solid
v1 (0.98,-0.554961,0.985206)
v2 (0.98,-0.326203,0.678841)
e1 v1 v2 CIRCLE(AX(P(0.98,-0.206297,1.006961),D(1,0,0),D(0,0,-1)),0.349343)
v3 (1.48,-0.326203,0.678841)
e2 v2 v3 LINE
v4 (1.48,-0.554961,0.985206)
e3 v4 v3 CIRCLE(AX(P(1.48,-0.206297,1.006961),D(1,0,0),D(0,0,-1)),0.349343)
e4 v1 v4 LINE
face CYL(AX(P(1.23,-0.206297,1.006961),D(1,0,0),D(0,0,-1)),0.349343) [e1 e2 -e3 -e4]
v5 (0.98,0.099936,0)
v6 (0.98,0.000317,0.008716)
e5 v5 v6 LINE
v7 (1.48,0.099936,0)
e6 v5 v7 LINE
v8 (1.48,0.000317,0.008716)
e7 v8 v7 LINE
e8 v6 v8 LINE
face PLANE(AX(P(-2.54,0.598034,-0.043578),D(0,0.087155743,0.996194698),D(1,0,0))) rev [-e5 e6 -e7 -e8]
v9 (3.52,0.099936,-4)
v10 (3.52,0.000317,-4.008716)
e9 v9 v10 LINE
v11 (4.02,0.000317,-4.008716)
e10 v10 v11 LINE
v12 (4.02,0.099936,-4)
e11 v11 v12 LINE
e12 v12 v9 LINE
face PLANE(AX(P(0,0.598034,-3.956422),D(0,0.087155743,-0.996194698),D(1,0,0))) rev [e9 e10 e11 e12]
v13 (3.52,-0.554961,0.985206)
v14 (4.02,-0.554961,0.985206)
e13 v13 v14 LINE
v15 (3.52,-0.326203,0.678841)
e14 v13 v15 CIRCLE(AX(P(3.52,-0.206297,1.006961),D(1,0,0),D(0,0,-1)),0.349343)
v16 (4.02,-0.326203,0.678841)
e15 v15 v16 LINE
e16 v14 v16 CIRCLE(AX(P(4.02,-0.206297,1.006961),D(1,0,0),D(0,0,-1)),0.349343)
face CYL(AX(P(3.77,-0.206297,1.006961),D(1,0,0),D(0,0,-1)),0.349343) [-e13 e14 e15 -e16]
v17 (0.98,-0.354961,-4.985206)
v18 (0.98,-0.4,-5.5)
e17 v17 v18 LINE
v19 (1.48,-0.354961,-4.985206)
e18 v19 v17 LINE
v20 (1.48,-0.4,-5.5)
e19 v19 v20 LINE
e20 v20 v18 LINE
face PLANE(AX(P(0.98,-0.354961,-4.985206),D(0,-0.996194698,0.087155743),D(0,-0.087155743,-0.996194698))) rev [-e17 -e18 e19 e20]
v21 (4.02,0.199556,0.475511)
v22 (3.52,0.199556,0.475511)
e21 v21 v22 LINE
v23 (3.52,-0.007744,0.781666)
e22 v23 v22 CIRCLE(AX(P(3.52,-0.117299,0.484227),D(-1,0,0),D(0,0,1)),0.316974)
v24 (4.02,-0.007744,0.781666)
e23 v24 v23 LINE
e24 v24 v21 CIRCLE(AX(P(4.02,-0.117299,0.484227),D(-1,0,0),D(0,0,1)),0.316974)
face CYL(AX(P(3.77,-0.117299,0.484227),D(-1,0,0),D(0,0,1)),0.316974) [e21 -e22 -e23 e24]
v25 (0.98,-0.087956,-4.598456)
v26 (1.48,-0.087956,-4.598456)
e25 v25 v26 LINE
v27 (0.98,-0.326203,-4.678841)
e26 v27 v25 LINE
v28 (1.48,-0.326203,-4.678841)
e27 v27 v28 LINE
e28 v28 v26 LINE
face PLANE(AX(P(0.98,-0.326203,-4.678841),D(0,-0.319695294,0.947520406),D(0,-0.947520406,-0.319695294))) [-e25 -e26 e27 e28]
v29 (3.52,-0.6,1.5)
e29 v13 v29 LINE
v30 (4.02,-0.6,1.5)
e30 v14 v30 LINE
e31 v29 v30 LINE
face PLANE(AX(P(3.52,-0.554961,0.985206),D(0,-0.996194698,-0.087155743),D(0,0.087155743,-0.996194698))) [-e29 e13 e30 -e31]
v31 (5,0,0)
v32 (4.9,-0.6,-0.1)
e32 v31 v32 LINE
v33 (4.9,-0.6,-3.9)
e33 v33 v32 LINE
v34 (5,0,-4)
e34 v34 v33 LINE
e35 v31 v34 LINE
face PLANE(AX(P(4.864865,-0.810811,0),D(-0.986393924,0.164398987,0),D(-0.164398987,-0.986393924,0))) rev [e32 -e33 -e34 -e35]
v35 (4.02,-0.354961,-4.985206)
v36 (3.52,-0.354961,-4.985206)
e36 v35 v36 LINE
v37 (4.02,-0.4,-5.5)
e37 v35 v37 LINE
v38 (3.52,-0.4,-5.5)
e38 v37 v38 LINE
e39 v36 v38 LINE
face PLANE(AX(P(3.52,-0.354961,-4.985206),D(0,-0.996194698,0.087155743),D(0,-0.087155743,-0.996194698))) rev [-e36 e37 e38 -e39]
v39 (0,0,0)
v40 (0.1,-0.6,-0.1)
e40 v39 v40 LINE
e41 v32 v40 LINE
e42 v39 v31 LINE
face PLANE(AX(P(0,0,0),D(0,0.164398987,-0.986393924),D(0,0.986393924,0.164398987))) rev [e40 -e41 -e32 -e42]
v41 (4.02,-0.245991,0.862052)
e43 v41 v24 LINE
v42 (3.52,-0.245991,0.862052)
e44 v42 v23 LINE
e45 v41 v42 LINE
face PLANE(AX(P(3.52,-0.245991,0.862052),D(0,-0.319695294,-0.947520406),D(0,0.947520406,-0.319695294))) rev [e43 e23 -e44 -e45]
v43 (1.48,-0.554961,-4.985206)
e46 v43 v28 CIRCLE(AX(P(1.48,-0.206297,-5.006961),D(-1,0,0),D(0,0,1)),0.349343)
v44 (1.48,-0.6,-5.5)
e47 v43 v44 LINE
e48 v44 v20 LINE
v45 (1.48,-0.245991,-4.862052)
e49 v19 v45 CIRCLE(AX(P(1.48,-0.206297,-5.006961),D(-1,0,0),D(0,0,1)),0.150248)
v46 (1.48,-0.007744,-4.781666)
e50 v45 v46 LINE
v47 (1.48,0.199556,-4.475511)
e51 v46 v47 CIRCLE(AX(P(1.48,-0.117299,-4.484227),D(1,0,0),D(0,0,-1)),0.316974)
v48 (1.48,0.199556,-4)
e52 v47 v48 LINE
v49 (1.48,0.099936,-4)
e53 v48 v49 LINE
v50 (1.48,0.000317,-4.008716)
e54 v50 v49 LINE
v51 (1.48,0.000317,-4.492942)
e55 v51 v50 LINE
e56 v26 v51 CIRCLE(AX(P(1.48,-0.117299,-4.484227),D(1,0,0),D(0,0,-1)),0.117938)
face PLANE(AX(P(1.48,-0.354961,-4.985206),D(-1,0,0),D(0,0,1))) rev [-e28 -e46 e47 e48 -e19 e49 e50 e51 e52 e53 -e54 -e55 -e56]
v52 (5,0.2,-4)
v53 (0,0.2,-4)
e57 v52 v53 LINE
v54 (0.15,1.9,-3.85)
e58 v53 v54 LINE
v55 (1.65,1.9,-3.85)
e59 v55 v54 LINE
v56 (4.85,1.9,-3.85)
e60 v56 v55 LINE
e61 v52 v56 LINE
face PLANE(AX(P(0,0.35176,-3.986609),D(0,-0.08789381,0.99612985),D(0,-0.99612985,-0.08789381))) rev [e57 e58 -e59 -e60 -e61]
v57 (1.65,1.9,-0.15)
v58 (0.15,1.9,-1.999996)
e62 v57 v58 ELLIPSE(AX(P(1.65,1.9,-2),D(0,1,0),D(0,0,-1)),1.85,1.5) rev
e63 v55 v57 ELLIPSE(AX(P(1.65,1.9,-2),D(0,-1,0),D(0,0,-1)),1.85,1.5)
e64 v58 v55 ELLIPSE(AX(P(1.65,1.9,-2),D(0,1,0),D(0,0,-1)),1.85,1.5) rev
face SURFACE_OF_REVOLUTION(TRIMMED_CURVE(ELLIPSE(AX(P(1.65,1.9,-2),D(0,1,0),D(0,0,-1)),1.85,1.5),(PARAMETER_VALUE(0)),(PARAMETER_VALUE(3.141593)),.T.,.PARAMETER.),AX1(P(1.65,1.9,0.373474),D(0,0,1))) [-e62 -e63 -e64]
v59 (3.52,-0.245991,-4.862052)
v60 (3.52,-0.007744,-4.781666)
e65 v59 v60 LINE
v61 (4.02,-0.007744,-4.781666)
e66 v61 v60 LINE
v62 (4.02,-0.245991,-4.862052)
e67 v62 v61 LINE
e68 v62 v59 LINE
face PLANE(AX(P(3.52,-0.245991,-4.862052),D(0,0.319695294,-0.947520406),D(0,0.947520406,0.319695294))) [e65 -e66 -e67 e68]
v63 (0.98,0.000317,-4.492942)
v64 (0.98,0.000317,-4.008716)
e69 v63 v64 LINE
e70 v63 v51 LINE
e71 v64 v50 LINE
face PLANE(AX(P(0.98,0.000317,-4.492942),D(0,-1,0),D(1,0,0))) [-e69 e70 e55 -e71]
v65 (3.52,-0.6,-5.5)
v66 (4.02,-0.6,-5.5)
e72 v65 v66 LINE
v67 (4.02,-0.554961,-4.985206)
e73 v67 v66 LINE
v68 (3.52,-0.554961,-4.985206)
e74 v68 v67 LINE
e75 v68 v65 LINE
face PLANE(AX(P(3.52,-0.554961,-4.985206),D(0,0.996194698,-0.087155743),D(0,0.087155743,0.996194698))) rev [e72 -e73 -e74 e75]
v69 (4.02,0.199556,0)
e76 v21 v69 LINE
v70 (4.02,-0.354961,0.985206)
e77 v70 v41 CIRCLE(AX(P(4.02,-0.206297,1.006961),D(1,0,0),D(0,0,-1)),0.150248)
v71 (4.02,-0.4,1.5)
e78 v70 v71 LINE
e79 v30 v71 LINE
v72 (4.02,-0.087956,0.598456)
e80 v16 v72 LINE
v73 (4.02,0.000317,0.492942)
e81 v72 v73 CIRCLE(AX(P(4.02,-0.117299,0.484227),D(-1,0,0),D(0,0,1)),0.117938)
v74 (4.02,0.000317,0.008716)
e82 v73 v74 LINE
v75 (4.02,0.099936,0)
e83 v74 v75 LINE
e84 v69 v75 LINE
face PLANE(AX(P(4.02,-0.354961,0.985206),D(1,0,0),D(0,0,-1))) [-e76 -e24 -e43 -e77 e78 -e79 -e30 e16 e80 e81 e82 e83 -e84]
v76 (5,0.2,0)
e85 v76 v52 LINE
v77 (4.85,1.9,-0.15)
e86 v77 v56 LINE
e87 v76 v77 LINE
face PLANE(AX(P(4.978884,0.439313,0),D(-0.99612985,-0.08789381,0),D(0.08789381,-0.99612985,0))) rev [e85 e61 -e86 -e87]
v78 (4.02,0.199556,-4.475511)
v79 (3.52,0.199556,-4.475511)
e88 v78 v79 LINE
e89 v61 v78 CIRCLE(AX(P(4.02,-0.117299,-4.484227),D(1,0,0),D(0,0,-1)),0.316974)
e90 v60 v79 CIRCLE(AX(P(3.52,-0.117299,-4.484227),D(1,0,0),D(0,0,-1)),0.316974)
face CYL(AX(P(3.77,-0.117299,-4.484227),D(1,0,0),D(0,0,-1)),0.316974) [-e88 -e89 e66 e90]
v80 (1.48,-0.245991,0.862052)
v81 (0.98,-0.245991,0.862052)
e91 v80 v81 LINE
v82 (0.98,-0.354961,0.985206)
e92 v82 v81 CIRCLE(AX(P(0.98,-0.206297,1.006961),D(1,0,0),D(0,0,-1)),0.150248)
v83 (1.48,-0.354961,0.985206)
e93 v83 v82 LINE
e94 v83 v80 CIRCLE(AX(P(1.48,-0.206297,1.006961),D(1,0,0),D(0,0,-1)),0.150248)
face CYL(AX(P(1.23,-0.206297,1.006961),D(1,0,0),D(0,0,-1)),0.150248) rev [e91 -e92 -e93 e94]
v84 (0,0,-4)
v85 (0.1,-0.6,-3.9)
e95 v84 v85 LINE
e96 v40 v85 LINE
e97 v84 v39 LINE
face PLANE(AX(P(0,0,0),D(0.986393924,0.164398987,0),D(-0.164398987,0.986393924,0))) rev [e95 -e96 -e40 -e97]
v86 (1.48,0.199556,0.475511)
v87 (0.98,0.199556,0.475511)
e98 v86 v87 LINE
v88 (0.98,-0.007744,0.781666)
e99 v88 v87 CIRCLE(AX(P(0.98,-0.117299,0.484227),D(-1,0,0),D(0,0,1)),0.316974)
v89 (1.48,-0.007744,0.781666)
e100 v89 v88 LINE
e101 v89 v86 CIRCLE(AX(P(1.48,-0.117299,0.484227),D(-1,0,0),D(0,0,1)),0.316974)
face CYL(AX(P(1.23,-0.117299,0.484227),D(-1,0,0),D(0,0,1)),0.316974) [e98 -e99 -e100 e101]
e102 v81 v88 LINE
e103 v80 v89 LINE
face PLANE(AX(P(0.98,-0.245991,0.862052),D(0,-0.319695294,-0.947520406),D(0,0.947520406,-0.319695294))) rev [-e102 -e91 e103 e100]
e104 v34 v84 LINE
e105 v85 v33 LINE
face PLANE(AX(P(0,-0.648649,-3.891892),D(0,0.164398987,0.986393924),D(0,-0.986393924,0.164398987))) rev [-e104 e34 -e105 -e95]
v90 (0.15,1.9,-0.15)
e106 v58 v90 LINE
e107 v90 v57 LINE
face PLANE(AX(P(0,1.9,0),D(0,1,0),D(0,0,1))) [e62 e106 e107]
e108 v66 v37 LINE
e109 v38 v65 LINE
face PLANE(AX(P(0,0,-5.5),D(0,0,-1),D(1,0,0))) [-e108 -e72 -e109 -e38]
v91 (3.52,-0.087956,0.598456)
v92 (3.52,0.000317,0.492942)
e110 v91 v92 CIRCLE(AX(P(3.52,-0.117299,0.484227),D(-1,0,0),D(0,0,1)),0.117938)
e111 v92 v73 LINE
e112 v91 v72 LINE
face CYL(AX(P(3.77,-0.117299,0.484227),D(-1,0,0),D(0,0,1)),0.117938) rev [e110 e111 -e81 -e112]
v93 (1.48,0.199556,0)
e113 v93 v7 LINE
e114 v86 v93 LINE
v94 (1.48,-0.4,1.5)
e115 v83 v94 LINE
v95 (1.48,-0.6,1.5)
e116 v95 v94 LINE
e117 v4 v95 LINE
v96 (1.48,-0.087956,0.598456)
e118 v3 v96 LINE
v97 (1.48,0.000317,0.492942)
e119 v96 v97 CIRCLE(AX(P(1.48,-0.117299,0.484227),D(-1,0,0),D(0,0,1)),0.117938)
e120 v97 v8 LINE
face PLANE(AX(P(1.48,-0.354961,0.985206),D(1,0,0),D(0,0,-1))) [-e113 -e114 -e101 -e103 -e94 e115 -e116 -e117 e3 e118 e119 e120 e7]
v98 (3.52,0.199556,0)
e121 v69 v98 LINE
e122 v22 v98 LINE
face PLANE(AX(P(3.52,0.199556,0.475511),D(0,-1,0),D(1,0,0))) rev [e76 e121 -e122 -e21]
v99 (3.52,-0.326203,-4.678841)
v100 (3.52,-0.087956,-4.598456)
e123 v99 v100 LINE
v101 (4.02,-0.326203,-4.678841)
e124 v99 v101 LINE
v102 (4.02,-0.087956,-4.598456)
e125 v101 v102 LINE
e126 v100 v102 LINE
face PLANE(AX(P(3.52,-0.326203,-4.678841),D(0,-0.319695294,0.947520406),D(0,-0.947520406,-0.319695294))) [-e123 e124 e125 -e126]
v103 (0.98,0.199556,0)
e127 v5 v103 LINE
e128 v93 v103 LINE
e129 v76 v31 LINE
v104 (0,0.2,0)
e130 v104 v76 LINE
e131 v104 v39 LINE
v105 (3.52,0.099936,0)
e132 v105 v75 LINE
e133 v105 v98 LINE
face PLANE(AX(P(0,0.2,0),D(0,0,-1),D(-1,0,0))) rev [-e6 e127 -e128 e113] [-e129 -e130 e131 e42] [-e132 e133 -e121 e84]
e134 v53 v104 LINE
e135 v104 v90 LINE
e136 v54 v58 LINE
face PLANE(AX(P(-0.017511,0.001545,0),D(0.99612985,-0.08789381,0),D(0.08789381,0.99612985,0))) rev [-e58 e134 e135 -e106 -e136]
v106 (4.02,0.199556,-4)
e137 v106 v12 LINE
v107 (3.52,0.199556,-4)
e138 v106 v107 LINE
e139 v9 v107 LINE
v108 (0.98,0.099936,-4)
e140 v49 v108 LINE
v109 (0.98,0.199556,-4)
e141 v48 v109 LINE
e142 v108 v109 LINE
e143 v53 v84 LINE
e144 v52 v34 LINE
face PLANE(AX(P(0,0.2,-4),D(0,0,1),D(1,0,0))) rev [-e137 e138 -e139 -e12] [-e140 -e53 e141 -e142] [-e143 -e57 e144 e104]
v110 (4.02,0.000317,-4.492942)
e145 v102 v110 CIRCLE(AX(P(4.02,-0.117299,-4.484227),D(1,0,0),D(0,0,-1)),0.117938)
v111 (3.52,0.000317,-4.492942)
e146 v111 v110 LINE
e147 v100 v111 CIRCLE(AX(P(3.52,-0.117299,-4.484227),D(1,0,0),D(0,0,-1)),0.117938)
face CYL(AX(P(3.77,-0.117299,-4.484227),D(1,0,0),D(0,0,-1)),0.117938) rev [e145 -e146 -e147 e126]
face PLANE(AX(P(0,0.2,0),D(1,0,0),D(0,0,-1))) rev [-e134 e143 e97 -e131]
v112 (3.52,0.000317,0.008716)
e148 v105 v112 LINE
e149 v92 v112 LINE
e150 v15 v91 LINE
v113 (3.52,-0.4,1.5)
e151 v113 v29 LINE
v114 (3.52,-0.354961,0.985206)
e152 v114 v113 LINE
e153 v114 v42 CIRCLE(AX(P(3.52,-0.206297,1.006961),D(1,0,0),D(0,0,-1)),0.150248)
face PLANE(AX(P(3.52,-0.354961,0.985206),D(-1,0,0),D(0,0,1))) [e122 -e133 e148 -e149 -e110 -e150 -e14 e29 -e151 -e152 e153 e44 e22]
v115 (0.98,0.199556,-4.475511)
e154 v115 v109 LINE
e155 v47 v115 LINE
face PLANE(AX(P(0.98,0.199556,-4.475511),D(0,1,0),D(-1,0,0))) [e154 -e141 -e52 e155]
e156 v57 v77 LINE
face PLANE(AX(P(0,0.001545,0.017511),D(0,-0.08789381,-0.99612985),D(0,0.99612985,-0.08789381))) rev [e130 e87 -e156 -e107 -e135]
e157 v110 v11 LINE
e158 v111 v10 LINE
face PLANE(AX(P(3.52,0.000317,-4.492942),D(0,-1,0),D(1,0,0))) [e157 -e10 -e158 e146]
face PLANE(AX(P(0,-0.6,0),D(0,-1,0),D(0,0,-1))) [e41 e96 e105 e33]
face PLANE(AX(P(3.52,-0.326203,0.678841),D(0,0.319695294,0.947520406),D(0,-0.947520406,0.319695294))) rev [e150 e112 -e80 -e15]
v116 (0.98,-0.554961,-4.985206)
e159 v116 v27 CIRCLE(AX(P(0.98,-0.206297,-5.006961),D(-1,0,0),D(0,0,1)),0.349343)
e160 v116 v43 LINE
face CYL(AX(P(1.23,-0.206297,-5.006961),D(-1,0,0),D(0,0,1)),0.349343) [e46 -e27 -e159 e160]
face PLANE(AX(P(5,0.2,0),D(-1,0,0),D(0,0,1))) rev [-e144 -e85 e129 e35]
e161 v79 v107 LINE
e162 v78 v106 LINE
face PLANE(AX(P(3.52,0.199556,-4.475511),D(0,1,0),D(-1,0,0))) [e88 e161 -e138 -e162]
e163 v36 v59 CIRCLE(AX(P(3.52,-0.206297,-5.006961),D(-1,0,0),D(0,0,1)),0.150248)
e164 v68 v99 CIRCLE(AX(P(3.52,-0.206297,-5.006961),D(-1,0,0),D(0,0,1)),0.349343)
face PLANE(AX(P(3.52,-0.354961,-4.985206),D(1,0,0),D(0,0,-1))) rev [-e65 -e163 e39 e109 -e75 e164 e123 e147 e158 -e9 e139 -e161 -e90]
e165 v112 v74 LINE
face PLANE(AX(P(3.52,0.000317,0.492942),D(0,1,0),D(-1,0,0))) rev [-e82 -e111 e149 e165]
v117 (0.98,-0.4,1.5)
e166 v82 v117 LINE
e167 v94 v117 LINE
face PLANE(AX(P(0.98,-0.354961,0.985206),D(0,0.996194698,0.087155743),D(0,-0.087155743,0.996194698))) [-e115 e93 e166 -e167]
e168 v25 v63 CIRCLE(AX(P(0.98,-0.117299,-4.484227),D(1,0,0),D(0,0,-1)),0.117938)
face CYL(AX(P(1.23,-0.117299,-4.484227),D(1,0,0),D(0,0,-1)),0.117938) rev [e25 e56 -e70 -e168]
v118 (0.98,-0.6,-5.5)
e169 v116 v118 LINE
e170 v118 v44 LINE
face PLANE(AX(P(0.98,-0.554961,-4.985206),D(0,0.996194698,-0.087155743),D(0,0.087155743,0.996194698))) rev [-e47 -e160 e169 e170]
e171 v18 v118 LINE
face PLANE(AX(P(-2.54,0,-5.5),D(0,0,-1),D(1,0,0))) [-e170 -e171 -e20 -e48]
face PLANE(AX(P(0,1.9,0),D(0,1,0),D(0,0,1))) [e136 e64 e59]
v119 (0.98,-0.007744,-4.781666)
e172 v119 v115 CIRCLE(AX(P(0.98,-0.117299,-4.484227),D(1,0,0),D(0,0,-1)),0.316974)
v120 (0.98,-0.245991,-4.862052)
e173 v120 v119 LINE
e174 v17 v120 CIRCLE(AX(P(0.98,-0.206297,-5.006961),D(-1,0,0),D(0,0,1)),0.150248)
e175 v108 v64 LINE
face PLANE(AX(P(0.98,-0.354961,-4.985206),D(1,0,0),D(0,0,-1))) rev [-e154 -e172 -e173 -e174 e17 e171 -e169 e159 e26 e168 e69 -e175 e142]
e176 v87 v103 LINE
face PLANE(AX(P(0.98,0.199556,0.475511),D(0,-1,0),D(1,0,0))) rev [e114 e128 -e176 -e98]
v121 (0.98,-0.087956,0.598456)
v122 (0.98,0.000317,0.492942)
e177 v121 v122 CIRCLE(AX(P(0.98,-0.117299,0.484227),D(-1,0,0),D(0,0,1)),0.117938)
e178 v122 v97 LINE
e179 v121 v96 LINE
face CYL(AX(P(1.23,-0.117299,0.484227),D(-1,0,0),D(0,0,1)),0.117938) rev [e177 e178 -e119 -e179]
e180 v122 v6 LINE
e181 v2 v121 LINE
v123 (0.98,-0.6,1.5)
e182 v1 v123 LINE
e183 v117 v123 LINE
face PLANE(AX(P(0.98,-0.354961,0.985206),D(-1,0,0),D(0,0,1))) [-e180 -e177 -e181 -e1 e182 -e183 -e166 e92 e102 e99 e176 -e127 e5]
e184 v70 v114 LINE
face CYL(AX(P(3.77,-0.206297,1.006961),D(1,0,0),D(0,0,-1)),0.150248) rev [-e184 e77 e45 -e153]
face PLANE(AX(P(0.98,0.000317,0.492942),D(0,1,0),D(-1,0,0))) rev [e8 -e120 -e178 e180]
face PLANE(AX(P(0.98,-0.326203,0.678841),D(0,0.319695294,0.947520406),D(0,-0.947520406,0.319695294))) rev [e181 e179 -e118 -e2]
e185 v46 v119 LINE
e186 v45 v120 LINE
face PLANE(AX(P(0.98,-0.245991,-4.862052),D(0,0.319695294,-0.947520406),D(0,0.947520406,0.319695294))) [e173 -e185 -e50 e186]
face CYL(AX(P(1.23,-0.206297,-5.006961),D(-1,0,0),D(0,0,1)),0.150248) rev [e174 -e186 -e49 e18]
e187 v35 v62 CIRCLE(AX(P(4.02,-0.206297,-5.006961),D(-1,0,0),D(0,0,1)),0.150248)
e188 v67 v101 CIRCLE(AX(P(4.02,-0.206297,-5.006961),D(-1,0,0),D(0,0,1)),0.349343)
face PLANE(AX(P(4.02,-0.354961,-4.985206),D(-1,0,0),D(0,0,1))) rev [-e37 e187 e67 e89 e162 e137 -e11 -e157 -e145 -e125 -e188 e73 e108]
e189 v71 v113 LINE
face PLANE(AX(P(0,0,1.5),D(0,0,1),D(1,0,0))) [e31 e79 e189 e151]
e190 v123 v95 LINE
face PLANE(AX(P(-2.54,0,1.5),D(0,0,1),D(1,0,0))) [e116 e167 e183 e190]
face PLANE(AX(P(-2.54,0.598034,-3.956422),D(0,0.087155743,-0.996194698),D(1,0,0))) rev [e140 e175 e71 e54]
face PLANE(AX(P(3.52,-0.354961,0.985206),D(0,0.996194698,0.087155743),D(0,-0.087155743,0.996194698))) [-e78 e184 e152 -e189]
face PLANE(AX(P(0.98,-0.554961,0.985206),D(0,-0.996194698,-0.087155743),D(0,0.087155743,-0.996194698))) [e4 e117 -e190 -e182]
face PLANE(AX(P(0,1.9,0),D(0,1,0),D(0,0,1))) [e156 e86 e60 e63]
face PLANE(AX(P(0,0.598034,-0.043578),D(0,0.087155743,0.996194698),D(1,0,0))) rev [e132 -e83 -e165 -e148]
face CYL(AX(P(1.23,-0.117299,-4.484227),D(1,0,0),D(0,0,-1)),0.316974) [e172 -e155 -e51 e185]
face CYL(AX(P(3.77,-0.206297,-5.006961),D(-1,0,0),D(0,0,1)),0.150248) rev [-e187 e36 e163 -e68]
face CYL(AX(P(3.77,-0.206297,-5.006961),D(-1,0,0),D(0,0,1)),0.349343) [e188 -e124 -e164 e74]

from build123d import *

# Parameters (mm, degrees)
SKETCH_1_W               = 5
SKETCH_1_H               = 4
EXTRUDE_1_DEPTH          = 0.2
LOFT_3_OUTLINE_W         = 4.8
LOFT_3_OUTLINE_H         = 3.8
LOFT_3_DEPTH             = 0.6
LOFT_3_DRAFT             = -9.4623222
SKETCH_9_W               = 0.5
SKETCH_9_H               = 0.2
PATTERN_LINEAR_1_COUNT   = 2
PATTERN_LINEAR_1_PITCH   = 2.54
MIRROR_1_COPY_1_SKETCH_W = 0.5
MIRROR_1_COPY_1_SKETCH_H = 0.2


# Read off the part's stored shape, not the designer's step: 放样3
with BuildPart() as part:
    # 草图1 → 凸台-拉伸1 (new body)
    with BuildSketch(Plane(origin=(0, 0, 0), x_dir=(1, 0, 0), z_dir=(0, 1, 0))):
        with Locations((2.5, 2)):
            Rectangle(SKETCH_1_W, SKETCH_1_H)
    extrude(amount=EXTRUDE_1_DEPTH)


with BuildPart() as loft_3_tool:
    # 放样3 outline → 放样3 (with draft: the straight prism first)
    with BuildSketch(Plane(origin=(0, -0.6, 0), x_dir=(1, 0, 0), z_dir=(0, 1, 0))):
        with Locations((2.5, 2)):
            Rectangle(LOFT_3_OUTLINE_W, LOFT_3_OUTLINE_H)
    extrude(amount=LOFT_3_DEPTH)
    # 放样3: the draft: its side faces are tilted about the plane it starts from
    loft_3_sides = [loft_3_tool.faces().sort_by_distance(p)[0] for p in [
        (2.5, -0.3, -3.9),
        (0.1, -0.3, -2),
        (2.5, -0.3, -0.1),
        (4.9, -0.3, -2),
    ]]
    draft(loft_3_sides, Plane(origin=(0, -0.6, 0), x_dir=(1, 0, 0), z_dir=(0, 1, 0)), LOFT_3_DRAFT)


with BuildPart() as part_1:
    add(part.part)

    # 放样3: add loft_3_tool
    add(loft_3_tool.part)

    # 草图4 → 放样5 section 0
    with BuildSketch(Plane(origin=(0, 0.2, 0), x_dir=(1, 0, 0), z_dir=(0, 1, 0))):
        with BuildLine():
            Line((0, 4), (5, 4))
            Line((5, 4), (5, 0))
            Line((5, 0), (0, 0))
            Line((0, 0), (0, 4))
        make_face()
    # 草图3 → 放样5 section 1
    with BuildSketch(Plane(origin=(0, 1.9, 0), x_dir=(1, 0, 0), z_dir=(0, 1, 0))):
        with BuildLine():
            Line((0.15, 3.85), (4.85, 3.85))
            Line((4.85, 3.85), (4.85, 0.15))
            Line((4.85, 0.15), (0.15, 0.15))
            Line((0.15, 0.15), (0.15, 3.85))
        make_face()
    loft()

    # 草图6 → 旋转1 (revolve)
    with BuildSketch(Plane(origin=(0, 1.9, 0), x_dir=(1, 0, 0), z_dir=(0, 1, 0))):
        with BuildLine():
            Line((1.65, 3.85), (1.65, 0.15))
            add(Edge.make_bspline(
                [(1.65, 3.85), (0.15, 3.85), (0.15, 2), (0.15, 0.15), (1.65, 0.15)],
                knots=[0, 0, 0, 1.570796327, 1.570796327, 3.141592654, 3.141592654, 3.141592654], degree=2, weights=[1, 0.707106781, 1, 0.707106781, 1]))
        make_face()
    revolve(axis=Axis((1.65, 1.9, 0.373474455), (0, 0, -1)))

    # 扫描2: sweep along a path in 草图7
    with BuildLine(Plane(origin=(3.77, 0, 0), x_dir=(0, 0, -1), z_dir=(1, 0, 0))) as sweep_2_path:
        Line((0, 0.099936428), (-0.484226547, 0.099936428))
        ThreePointArc((-0.484226547, 0.099936428), (-0.610923653, 0.059163591), (-0.690061218, -0.047849619))
        Line((-0.690061218, -0.047849619), (-0.770446454, -0.286097268))
        ThreePointArc((-0.770446454, -0.286097268), (-0.852673785, -0.402517912), (-0.98520599, -0.45496136))
        Line((-0.98520599, -0.45496136), (-1.5, -0.5))
    # 草图9 → 扫描2 (sweep)
    with BuildSketch(Plane.XY.offset(1.5)):
        with Locations((3.77, -0.5)):
            Rectangle(SKETCH_9_W, SKETCH_9_H)
    sweep_2 = sweep(path=sweep_2_path.line)

    # 阵列(线性)1: 扫描2 ×2
    with Locations(*[(-i * PATTERN_LINEAR_1_PITCH, 0, 0) for i in range(1, PATTERN_LINEAR_1_COUNT)]):
        add(sweep_2)

    # 镜向1: 扫描2 across plane
    add(sweep_2.mirror(Plane.XY.offset(-2)))

    # 镜向1 copy 1: sweep along a path in 镜向1 copy 1 path
    with BuildLine(Plane(origin=(1.23, 0, -4), x_dir=(0, 0, 1), z_dir=(1, 0, 0))) as mirror_1_copy_1_path:
        Line((0, -0.099936428), (-0.484226547, -0.099936428))
        ThreePointArc((-0.484226547, -0.099936428), (-0.610923653, -0.059163591), (-0.690061218, 0.047849619))
        Line((-0.690061218, 0.047849619), (-0.770446454, 0.286097268))
        ThreePointArc((-0.770446454, 0.286097268), (-0.852673785, 0.402517912), (-0.98520599, 0.45496136))
        Line((-0.98520599, 0.45496136), (-1.5, 0.5))
    # 镜向1 copy 1 sketch → 镜向1 copy 1 (sweep)
    with BuildSketch(Plane(origin=(-2.54, 0, -5.5), x_dir=(1, 0, 0), z_dir=(0, 0, -1))):
        with Locations((3.77, 0.5)):
            Rectangle(MIRROR_1_COPY_1_SKETCH_W, MIRROR_1_COPY_1_SKETCH_H)
    sweep(path=mirror_1_copy_1_path.line)


solid = part_1.part
